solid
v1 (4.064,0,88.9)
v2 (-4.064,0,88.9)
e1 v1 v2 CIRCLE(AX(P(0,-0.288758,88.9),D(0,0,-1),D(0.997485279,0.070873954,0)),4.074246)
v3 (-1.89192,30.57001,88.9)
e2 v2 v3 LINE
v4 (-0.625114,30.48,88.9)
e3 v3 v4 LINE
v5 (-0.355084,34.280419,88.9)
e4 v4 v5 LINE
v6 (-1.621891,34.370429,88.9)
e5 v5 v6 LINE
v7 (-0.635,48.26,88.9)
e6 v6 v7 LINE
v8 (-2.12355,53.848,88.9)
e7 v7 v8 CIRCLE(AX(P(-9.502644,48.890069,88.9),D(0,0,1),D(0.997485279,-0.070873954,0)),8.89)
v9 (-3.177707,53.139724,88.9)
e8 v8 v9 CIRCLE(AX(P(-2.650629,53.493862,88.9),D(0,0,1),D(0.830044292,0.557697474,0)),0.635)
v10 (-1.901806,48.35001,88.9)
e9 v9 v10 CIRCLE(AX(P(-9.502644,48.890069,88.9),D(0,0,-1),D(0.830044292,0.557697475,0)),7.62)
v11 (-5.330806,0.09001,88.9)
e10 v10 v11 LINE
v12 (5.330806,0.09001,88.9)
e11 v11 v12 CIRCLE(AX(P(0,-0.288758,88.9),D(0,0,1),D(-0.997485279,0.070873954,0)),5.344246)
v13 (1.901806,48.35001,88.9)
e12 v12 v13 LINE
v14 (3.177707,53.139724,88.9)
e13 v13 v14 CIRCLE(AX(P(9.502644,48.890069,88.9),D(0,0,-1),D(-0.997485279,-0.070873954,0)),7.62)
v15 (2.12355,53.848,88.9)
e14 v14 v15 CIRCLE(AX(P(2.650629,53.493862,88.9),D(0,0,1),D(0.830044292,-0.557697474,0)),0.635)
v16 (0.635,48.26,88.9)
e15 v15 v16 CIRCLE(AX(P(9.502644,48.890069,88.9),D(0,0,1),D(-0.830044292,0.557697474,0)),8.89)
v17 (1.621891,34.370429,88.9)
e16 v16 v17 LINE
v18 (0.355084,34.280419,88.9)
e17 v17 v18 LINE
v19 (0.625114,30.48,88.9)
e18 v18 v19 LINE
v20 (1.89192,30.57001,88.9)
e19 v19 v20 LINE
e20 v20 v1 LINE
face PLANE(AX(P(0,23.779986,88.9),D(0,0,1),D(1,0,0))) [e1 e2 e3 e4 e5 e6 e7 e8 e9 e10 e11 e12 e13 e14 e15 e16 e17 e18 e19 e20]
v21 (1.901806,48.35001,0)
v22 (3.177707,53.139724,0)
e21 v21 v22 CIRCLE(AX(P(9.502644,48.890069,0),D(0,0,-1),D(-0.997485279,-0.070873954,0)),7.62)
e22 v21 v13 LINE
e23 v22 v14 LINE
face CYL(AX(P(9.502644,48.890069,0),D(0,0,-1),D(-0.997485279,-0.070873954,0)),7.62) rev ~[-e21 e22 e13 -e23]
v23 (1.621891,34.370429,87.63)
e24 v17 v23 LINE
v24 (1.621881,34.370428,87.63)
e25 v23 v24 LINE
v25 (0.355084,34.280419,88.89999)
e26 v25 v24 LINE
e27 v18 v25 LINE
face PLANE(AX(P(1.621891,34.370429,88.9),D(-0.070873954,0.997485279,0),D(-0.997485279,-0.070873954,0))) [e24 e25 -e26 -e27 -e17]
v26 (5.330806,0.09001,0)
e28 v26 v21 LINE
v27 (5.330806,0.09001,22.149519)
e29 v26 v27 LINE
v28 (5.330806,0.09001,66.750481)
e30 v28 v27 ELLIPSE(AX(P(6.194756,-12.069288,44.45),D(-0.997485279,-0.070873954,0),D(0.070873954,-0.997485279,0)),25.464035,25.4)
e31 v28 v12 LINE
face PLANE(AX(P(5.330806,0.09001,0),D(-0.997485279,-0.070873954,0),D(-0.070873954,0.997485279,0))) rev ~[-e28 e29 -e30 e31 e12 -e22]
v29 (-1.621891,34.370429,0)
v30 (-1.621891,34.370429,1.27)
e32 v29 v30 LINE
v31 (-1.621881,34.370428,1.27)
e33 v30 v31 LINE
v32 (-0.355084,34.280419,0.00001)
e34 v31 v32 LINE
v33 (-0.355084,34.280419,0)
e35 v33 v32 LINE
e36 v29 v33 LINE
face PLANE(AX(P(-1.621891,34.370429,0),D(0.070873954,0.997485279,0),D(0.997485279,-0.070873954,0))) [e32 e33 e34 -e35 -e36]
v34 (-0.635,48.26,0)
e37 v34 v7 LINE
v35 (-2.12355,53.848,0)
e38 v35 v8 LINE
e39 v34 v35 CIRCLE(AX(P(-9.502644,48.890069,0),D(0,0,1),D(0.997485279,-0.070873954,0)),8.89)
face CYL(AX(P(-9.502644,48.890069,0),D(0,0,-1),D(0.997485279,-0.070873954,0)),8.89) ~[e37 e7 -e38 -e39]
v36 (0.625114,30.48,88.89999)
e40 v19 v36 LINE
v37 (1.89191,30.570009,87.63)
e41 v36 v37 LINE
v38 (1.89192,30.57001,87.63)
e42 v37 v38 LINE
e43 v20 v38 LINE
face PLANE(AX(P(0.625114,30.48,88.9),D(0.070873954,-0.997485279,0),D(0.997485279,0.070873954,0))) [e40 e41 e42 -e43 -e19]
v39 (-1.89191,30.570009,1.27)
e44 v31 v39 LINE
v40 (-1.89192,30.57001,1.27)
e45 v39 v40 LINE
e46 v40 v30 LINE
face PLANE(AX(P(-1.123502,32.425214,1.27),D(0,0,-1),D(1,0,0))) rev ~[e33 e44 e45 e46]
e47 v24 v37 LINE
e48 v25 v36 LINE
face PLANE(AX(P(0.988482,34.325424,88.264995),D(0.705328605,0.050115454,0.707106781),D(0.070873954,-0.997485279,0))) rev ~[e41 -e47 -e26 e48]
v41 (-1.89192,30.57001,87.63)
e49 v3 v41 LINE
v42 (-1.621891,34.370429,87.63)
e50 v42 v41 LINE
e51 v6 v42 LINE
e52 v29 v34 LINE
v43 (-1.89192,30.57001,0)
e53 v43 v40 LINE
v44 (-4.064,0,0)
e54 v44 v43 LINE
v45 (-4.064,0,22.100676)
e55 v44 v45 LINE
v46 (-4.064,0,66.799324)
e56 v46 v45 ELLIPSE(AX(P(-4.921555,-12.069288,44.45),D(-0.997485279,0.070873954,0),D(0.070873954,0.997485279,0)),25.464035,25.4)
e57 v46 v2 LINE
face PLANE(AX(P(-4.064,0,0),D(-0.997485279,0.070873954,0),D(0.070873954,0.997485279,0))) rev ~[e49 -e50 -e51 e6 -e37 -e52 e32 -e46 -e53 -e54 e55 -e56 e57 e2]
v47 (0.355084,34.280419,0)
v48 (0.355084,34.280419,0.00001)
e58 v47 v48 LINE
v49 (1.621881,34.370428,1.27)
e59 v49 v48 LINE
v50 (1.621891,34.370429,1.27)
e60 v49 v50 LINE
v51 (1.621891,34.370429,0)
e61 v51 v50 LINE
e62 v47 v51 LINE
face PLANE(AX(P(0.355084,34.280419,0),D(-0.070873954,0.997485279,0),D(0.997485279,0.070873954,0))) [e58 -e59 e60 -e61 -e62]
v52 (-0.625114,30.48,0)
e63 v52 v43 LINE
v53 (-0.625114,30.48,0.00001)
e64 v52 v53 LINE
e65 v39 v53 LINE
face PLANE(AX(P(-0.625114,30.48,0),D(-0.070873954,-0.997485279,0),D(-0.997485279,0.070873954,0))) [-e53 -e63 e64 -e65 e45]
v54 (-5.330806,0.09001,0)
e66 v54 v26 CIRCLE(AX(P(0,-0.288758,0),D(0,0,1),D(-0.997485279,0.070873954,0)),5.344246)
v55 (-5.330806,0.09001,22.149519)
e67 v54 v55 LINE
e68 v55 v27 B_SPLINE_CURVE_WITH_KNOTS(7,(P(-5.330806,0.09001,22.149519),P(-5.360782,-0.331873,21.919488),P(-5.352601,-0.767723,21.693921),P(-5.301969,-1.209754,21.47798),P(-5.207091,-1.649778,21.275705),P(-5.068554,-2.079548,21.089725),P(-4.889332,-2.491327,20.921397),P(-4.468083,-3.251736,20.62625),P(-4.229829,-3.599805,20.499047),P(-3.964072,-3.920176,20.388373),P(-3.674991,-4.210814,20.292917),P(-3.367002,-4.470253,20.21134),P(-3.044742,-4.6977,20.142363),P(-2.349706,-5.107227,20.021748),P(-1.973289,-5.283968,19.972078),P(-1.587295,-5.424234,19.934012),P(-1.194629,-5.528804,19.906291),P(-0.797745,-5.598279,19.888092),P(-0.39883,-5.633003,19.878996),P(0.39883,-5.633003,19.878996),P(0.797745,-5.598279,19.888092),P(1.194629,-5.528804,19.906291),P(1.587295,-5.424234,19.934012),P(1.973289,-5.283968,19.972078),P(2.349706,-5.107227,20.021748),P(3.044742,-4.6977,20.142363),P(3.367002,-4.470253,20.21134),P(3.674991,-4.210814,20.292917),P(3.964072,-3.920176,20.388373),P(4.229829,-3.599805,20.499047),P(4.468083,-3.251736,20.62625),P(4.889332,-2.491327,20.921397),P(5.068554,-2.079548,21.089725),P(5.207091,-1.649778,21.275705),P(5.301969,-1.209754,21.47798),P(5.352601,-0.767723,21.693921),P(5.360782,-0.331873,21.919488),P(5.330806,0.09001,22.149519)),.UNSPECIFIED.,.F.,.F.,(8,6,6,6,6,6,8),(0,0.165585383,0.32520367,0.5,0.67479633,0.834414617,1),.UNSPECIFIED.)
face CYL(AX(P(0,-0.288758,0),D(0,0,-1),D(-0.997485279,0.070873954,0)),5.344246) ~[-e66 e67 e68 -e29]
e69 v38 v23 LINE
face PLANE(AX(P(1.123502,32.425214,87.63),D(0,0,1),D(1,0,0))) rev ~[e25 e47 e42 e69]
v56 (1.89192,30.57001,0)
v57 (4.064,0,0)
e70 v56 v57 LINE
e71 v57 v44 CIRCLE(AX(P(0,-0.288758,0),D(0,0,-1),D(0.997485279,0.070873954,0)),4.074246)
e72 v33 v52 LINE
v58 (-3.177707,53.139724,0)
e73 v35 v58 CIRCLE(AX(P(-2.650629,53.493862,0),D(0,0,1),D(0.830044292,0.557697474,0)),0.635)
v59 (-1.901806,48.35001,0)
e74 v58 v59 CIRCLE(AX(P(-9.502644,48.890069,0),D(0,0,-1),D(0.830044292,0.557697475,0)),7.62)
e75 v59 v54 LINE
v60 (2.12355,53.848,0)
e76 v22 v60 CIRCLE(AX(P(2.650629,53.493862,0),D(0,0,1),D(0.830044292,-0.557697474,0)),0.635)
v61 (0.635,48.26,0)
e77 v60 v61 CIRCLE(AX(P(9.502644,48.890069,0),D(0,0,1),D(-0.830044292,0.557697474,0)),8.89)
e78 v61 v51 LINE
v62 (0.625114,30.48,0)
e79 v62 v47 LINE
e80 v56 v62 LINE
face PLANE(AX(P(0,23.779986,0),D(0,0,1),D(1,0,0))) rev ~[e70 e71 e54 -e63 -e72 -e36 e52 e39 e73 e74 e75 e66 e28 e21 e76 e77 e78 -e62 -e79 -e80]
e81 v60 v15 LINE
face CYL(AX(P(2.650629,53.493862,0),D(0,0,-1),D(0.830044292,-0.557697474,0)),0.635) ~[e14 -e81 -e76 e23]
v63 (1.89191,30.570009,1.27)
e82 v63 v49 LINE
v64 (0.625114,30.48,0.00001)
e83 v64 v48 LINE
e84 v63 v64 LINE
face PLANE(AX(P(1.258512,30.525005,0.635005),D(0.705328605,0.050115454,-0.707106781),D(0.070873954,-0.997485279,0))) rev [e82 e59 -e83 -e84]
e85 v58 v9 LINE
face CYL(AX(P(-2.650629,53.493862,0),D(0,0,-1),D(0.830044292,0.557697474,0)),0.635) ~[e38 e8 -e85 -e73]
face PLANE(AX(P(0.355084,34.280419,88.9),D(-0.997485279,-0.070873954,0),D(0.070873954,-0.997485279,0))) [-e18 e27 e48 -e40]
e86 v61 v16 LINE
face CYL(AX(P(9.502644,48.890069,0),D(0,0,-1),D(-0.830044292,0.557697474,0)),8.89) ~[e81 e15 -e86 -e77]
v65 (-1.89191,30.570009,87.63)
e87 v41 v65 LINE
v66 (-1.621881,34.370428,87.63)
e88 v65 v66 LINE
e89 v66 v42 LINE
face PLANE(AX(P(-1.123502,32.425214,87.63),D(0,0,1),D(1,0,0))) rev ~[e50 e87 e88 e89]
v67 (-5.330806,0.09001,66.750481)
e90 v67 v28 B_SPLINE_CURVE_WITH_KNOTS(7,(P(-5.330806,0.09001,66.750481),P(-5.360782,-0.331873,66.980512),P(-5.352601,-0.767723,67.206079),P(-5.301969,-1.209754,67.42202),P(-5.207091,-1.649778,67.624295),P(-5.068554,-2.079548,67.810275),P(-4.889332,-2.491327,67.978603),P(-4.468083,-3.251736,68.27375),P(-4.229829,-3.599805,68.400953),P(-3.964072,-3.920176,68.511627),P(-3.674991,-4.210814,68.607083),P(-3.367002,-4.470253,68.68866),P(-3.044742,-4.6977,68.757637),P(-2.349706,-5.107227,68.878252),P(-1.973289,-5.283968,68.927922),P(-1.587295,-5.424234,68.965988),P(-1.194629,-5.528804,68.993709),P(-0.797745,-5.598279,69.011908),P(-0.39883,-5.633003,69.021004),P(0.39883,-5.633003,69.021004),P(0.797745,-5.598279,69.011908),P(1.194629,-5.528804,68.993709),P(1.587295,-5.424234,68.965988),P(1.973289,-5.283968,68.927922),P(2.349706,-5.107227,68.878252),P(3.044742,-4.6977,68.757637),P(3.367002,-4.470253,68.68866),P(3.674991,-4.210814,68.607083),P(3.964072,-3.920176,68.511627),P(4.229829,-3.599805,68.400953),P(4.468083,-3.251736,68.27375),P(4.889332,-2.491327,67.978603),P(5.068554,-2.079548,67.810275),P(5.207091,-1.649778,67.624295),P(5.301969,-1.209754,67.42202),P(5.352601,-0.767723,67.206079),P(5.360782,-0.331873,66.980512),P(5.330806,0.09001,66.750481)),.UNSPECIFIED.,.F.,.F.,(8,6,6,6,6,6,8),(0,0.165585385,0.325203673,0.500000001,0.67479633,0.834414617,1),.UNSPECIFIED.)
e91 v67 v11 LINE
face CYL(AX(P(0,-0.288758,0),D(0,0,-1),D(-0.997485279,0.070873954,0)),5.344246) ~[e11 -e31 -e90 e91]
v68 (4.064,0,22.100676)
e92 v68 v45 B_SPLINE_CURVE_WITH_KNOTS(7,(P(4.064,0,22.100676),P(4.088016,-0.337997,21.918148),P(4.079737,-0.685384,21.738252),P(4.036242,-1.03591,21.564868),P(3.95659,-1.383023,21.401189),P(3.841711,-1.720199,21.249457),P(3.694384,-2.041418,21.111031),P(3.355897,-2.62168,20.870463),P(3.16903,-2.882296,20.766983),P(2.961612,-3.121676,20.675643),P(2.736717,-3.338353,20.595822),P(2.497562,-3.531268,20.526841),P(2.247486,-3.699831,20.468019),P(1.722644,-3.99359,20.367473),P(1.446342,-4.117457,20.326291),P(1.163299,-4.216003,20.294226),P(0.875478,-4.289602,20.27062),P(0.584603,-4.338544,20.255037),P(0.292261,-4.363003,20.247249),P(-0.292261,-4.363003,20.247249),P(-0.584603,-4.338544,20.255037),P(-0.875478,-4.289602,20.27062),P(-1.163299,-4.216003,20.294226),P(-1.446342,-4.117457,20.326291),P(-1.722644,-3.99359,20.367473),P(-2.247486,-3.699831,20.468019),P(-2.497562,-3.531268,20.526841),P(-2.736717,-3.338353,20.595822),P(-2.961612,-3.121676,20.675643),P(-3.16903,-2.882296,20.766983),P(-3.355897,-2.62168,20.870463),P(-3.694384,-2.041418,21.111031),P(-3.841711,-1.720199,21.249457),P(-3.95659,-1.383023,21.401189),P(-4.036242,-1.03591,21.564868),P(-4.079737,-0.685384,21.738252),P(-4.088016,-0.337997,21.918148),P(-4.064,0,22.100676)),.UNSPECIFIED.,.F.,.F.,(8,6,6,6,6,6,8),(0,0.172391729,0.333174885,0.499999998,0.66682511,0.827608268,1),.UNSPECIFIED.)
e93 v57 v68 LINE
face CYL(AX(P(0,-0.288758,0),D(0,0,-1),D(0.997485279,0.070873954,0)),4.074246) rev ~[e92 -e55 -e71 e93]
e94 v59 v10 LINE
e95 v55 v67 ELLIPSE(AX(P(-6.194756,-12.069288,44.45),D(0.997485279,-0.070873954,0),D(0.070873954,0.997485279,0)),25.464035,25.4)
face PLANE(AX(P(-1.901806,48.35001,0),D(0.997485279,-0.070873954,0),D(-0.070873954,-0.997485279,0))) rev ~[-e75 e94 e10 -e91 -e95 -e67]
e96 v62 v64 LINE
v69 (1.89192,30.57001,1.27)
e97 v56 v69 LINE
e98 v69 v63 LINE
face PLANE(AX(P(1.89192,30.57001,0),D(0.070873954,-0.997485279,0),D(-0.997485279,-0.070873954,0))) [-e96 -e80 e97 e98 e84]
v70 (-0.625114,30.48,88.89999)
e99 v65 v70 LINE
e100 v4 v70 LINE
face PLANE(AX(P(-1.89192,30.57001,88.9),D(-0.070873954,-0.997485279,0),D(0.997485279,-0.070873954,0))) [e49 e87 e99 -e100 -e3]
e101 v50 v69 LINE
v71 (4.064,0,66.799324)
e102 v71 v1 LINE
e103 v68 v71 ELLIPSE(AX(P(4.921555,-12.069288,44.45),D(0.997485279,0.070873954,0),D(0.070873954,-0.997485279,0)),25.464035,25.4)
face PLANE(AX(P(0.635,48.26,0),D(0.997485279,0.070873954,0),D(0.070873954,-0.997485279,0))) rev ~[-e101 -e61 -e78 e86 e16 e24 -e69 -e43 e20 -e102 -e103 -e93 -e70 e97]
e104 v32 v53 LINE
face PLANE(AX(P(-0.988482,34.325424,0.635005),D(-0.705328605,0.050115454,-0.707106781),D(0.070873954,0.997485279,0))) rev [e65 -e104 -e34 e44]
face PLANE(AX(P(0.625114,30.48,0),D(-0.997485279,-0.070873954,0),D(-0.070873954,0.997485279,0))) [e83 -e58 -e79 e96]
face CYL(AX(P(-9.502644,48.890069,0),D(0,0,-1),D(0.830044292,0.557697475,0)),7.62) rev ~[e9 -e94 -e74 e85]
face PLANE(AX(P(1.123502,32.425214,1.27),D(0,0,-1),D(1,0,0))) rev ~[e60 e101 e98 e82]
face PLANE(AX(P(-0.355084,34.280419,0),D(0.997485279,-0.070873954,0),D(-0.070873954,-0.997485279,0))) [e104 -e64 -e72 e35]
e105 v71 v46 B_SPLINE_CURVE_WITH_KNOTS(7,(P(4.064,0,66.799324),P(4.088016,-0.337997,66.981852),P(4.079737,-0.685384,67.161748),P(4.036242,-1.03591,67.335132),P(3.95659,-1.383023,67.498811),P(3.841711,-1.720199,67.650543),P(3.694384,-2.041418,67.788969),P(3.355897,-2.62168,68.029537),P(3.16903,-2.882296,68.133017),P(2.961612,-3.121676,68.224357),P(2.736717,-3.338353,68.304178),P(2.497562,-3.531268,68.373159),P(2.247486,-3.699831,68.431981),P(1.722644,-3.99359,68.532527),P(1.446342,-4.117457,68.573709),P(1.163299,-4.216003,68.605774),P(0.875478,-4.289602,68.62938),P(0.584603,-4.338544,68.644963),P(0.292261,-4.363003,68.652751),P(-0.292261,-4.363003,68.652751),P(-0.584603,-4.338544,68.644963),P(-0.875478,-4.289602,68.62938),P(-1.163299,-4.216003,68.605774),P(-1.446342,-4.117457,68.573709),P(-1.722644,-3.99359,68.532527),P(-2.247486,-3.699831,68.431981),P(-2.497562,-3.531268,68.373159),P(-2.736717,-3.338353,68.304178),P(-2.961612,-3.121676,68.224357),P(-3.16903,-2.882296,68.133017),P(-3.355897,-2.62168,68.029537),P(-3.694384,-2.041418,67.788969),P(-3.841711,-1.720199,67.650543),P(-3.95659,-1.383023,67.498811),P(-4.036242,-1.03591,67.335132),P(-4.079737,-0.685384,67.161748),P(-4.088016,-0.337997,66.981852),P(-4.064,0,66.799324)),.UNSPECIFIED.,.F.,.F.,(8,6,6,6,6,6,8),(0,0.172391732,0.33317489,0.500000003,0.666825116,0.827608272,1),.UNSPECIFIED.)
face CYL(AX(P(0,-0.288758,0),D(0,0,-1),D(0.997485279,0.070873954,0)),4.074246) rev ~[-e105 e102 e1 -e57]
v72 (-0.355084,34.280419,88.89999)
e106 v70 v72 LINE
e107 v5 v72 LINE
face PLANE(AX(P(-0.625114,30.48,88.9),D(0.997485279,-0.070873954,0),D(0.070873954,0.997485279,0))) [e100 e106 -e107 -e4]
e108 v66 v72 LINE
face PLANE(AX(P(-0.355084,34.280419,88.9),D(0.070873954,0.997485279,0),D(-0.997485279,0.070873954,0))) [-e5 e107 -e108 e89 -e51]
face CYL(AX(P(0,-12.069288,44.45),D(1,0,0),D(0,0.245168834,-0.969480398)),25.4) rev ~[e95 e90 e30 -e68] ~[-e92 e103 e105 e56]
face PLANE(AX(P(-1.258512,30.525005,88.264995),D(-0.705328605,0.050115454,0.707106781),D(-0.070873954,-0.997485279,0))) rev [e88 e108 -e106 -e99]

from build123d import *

# Parameters (mm, degrees)
F1_DEPTH = 88.9
F3_DEPTH = 1.27
F5_DEPTH = 1.27
F6_SIZE  = 1.26999
F8_DEPTH = 12.7


# Not quite as in the source:
# - a fillet or chamfer is up to 0.001 mm smaller than in the source, because OpenCascade refuses the exact size


with BuildPart() as f1:
    # F0 (on Top) → F1 (new body)
    with BuildSketch(Plane.XY):
        with BuildLine():
            Line((-4.064, 0), (-0.635, 48.26))
            ThreePointArc((-0.635, 48.26), (-0.9122099758, 51.1784184141), (-2.1235503767, 53.848))
            ThreePointArc((-2.1235503767, 53.848), (-3.0047663986, 54.0209402292), (-3.1777066278, 53.1397242074))
            ThreePointArc((-3.1777066278, 53.1397242074), (-2.1394148555, 50.8515114195), (-1.9018063048, 48.3500099217))
            Line((-1.9018063048, 48.3500099217), (-5.3308063048, 0.0900099217))
            ThreePointArc((-5.3308063048, 0.0900099217), (0, -5.633003484), (5.3308063048, 0.0900099217))
            Line((5.3308063048, 0.0900099217), (1.9018063048, 48.3500099217))
            ThreePointArc((1.9018063048, 48.3500099217), (2.1394148555, 50.8515114195), (3.1777066278, 53.1397242074))
            ThreePointArc((3.1777066278, 53.1397242074), (3.0047663986, 54.0209402292), (2.1235503767, 53.848))
            ThreePointArc((2.1235503767, 53.848), (0.9122099758, 51.1784184141), (0.635, 48.26))
            Line((0.635, 48.26), (4.064, 0))
            ThreePointArc((4.064, 0), (0, -4.363003484), (-4.064, 0))
        make_face()
    extrude(amount=F1_DEPTH)

    # F2 (on face) → F3 (join)
    with BuildSketch(Plane.XY.offset(88.9)):
        Polygon((-0.3550842778, 34.2804189145), (-1.6218905827, 34.3704288362), (-1.8919203477, 30.5700099217), (-0.6251140428, 30.48), align=None)
        Polygon((0.6251140428, 30.48), (1.8919203477, 30.5700099217), (1.6218905827, 34.3704288362), (0.3550842778, 34.2804189145), align=None)
    extrude(amount=-F3_DEPTH)

    # F4 (on face) → F5 (join)
    with BuildSketch(Plane(origin=(0, 0, 0), x_dir=(1, 0, 0), z_dir=(0, 0, -1))):
        Polygon((-0.6251140428, -30.48), (-1.8919203477, -30.5700099217), (-1.6218905827, -34.3704288362), (-0.3550842778, -34.2804189145), align=None)
        Polygon((1.6218905827, -34.3704288362), (1.8919203477, -30.5700099217), (0.6251140428, -30.48), (0.3550842778, -34.2804189145), align=None)
    extrude(amount=-F5_DEPTH)

    # F6 (size 1.27 in the source; OpenCascade refuses exactly that, so slightly less here)
    f6_edges = [f1.edges().sort_by_distance(p)[0] for p in [
        (-0.490099, 32.380209, 1.27),
        (0.490099, 32.380209, 1.27),
        (-0.490099, 32.380209, 87.63),
        (0.490099, 32.380209, 87.63),
    ]]
    chamfer(f6_edges, length=F6_SIZE)

    # F7 (on Right) → F8 (cut, symmetric)
    with BuildSketch(Plane.YZ):
        with BuildLine():
            ThreePointArc((-5.842, 19.8251978841), (13.3307116053, 44.45), (-5.842, 69.0748021159))
            Line((-5.842, 69.0748021159), (-5.842, 19.8251978841))
        make_face()
    extrude(amount=F8_DEPTH, both=True, mode=Mode.SUBTRACT)


solid = f1.part
